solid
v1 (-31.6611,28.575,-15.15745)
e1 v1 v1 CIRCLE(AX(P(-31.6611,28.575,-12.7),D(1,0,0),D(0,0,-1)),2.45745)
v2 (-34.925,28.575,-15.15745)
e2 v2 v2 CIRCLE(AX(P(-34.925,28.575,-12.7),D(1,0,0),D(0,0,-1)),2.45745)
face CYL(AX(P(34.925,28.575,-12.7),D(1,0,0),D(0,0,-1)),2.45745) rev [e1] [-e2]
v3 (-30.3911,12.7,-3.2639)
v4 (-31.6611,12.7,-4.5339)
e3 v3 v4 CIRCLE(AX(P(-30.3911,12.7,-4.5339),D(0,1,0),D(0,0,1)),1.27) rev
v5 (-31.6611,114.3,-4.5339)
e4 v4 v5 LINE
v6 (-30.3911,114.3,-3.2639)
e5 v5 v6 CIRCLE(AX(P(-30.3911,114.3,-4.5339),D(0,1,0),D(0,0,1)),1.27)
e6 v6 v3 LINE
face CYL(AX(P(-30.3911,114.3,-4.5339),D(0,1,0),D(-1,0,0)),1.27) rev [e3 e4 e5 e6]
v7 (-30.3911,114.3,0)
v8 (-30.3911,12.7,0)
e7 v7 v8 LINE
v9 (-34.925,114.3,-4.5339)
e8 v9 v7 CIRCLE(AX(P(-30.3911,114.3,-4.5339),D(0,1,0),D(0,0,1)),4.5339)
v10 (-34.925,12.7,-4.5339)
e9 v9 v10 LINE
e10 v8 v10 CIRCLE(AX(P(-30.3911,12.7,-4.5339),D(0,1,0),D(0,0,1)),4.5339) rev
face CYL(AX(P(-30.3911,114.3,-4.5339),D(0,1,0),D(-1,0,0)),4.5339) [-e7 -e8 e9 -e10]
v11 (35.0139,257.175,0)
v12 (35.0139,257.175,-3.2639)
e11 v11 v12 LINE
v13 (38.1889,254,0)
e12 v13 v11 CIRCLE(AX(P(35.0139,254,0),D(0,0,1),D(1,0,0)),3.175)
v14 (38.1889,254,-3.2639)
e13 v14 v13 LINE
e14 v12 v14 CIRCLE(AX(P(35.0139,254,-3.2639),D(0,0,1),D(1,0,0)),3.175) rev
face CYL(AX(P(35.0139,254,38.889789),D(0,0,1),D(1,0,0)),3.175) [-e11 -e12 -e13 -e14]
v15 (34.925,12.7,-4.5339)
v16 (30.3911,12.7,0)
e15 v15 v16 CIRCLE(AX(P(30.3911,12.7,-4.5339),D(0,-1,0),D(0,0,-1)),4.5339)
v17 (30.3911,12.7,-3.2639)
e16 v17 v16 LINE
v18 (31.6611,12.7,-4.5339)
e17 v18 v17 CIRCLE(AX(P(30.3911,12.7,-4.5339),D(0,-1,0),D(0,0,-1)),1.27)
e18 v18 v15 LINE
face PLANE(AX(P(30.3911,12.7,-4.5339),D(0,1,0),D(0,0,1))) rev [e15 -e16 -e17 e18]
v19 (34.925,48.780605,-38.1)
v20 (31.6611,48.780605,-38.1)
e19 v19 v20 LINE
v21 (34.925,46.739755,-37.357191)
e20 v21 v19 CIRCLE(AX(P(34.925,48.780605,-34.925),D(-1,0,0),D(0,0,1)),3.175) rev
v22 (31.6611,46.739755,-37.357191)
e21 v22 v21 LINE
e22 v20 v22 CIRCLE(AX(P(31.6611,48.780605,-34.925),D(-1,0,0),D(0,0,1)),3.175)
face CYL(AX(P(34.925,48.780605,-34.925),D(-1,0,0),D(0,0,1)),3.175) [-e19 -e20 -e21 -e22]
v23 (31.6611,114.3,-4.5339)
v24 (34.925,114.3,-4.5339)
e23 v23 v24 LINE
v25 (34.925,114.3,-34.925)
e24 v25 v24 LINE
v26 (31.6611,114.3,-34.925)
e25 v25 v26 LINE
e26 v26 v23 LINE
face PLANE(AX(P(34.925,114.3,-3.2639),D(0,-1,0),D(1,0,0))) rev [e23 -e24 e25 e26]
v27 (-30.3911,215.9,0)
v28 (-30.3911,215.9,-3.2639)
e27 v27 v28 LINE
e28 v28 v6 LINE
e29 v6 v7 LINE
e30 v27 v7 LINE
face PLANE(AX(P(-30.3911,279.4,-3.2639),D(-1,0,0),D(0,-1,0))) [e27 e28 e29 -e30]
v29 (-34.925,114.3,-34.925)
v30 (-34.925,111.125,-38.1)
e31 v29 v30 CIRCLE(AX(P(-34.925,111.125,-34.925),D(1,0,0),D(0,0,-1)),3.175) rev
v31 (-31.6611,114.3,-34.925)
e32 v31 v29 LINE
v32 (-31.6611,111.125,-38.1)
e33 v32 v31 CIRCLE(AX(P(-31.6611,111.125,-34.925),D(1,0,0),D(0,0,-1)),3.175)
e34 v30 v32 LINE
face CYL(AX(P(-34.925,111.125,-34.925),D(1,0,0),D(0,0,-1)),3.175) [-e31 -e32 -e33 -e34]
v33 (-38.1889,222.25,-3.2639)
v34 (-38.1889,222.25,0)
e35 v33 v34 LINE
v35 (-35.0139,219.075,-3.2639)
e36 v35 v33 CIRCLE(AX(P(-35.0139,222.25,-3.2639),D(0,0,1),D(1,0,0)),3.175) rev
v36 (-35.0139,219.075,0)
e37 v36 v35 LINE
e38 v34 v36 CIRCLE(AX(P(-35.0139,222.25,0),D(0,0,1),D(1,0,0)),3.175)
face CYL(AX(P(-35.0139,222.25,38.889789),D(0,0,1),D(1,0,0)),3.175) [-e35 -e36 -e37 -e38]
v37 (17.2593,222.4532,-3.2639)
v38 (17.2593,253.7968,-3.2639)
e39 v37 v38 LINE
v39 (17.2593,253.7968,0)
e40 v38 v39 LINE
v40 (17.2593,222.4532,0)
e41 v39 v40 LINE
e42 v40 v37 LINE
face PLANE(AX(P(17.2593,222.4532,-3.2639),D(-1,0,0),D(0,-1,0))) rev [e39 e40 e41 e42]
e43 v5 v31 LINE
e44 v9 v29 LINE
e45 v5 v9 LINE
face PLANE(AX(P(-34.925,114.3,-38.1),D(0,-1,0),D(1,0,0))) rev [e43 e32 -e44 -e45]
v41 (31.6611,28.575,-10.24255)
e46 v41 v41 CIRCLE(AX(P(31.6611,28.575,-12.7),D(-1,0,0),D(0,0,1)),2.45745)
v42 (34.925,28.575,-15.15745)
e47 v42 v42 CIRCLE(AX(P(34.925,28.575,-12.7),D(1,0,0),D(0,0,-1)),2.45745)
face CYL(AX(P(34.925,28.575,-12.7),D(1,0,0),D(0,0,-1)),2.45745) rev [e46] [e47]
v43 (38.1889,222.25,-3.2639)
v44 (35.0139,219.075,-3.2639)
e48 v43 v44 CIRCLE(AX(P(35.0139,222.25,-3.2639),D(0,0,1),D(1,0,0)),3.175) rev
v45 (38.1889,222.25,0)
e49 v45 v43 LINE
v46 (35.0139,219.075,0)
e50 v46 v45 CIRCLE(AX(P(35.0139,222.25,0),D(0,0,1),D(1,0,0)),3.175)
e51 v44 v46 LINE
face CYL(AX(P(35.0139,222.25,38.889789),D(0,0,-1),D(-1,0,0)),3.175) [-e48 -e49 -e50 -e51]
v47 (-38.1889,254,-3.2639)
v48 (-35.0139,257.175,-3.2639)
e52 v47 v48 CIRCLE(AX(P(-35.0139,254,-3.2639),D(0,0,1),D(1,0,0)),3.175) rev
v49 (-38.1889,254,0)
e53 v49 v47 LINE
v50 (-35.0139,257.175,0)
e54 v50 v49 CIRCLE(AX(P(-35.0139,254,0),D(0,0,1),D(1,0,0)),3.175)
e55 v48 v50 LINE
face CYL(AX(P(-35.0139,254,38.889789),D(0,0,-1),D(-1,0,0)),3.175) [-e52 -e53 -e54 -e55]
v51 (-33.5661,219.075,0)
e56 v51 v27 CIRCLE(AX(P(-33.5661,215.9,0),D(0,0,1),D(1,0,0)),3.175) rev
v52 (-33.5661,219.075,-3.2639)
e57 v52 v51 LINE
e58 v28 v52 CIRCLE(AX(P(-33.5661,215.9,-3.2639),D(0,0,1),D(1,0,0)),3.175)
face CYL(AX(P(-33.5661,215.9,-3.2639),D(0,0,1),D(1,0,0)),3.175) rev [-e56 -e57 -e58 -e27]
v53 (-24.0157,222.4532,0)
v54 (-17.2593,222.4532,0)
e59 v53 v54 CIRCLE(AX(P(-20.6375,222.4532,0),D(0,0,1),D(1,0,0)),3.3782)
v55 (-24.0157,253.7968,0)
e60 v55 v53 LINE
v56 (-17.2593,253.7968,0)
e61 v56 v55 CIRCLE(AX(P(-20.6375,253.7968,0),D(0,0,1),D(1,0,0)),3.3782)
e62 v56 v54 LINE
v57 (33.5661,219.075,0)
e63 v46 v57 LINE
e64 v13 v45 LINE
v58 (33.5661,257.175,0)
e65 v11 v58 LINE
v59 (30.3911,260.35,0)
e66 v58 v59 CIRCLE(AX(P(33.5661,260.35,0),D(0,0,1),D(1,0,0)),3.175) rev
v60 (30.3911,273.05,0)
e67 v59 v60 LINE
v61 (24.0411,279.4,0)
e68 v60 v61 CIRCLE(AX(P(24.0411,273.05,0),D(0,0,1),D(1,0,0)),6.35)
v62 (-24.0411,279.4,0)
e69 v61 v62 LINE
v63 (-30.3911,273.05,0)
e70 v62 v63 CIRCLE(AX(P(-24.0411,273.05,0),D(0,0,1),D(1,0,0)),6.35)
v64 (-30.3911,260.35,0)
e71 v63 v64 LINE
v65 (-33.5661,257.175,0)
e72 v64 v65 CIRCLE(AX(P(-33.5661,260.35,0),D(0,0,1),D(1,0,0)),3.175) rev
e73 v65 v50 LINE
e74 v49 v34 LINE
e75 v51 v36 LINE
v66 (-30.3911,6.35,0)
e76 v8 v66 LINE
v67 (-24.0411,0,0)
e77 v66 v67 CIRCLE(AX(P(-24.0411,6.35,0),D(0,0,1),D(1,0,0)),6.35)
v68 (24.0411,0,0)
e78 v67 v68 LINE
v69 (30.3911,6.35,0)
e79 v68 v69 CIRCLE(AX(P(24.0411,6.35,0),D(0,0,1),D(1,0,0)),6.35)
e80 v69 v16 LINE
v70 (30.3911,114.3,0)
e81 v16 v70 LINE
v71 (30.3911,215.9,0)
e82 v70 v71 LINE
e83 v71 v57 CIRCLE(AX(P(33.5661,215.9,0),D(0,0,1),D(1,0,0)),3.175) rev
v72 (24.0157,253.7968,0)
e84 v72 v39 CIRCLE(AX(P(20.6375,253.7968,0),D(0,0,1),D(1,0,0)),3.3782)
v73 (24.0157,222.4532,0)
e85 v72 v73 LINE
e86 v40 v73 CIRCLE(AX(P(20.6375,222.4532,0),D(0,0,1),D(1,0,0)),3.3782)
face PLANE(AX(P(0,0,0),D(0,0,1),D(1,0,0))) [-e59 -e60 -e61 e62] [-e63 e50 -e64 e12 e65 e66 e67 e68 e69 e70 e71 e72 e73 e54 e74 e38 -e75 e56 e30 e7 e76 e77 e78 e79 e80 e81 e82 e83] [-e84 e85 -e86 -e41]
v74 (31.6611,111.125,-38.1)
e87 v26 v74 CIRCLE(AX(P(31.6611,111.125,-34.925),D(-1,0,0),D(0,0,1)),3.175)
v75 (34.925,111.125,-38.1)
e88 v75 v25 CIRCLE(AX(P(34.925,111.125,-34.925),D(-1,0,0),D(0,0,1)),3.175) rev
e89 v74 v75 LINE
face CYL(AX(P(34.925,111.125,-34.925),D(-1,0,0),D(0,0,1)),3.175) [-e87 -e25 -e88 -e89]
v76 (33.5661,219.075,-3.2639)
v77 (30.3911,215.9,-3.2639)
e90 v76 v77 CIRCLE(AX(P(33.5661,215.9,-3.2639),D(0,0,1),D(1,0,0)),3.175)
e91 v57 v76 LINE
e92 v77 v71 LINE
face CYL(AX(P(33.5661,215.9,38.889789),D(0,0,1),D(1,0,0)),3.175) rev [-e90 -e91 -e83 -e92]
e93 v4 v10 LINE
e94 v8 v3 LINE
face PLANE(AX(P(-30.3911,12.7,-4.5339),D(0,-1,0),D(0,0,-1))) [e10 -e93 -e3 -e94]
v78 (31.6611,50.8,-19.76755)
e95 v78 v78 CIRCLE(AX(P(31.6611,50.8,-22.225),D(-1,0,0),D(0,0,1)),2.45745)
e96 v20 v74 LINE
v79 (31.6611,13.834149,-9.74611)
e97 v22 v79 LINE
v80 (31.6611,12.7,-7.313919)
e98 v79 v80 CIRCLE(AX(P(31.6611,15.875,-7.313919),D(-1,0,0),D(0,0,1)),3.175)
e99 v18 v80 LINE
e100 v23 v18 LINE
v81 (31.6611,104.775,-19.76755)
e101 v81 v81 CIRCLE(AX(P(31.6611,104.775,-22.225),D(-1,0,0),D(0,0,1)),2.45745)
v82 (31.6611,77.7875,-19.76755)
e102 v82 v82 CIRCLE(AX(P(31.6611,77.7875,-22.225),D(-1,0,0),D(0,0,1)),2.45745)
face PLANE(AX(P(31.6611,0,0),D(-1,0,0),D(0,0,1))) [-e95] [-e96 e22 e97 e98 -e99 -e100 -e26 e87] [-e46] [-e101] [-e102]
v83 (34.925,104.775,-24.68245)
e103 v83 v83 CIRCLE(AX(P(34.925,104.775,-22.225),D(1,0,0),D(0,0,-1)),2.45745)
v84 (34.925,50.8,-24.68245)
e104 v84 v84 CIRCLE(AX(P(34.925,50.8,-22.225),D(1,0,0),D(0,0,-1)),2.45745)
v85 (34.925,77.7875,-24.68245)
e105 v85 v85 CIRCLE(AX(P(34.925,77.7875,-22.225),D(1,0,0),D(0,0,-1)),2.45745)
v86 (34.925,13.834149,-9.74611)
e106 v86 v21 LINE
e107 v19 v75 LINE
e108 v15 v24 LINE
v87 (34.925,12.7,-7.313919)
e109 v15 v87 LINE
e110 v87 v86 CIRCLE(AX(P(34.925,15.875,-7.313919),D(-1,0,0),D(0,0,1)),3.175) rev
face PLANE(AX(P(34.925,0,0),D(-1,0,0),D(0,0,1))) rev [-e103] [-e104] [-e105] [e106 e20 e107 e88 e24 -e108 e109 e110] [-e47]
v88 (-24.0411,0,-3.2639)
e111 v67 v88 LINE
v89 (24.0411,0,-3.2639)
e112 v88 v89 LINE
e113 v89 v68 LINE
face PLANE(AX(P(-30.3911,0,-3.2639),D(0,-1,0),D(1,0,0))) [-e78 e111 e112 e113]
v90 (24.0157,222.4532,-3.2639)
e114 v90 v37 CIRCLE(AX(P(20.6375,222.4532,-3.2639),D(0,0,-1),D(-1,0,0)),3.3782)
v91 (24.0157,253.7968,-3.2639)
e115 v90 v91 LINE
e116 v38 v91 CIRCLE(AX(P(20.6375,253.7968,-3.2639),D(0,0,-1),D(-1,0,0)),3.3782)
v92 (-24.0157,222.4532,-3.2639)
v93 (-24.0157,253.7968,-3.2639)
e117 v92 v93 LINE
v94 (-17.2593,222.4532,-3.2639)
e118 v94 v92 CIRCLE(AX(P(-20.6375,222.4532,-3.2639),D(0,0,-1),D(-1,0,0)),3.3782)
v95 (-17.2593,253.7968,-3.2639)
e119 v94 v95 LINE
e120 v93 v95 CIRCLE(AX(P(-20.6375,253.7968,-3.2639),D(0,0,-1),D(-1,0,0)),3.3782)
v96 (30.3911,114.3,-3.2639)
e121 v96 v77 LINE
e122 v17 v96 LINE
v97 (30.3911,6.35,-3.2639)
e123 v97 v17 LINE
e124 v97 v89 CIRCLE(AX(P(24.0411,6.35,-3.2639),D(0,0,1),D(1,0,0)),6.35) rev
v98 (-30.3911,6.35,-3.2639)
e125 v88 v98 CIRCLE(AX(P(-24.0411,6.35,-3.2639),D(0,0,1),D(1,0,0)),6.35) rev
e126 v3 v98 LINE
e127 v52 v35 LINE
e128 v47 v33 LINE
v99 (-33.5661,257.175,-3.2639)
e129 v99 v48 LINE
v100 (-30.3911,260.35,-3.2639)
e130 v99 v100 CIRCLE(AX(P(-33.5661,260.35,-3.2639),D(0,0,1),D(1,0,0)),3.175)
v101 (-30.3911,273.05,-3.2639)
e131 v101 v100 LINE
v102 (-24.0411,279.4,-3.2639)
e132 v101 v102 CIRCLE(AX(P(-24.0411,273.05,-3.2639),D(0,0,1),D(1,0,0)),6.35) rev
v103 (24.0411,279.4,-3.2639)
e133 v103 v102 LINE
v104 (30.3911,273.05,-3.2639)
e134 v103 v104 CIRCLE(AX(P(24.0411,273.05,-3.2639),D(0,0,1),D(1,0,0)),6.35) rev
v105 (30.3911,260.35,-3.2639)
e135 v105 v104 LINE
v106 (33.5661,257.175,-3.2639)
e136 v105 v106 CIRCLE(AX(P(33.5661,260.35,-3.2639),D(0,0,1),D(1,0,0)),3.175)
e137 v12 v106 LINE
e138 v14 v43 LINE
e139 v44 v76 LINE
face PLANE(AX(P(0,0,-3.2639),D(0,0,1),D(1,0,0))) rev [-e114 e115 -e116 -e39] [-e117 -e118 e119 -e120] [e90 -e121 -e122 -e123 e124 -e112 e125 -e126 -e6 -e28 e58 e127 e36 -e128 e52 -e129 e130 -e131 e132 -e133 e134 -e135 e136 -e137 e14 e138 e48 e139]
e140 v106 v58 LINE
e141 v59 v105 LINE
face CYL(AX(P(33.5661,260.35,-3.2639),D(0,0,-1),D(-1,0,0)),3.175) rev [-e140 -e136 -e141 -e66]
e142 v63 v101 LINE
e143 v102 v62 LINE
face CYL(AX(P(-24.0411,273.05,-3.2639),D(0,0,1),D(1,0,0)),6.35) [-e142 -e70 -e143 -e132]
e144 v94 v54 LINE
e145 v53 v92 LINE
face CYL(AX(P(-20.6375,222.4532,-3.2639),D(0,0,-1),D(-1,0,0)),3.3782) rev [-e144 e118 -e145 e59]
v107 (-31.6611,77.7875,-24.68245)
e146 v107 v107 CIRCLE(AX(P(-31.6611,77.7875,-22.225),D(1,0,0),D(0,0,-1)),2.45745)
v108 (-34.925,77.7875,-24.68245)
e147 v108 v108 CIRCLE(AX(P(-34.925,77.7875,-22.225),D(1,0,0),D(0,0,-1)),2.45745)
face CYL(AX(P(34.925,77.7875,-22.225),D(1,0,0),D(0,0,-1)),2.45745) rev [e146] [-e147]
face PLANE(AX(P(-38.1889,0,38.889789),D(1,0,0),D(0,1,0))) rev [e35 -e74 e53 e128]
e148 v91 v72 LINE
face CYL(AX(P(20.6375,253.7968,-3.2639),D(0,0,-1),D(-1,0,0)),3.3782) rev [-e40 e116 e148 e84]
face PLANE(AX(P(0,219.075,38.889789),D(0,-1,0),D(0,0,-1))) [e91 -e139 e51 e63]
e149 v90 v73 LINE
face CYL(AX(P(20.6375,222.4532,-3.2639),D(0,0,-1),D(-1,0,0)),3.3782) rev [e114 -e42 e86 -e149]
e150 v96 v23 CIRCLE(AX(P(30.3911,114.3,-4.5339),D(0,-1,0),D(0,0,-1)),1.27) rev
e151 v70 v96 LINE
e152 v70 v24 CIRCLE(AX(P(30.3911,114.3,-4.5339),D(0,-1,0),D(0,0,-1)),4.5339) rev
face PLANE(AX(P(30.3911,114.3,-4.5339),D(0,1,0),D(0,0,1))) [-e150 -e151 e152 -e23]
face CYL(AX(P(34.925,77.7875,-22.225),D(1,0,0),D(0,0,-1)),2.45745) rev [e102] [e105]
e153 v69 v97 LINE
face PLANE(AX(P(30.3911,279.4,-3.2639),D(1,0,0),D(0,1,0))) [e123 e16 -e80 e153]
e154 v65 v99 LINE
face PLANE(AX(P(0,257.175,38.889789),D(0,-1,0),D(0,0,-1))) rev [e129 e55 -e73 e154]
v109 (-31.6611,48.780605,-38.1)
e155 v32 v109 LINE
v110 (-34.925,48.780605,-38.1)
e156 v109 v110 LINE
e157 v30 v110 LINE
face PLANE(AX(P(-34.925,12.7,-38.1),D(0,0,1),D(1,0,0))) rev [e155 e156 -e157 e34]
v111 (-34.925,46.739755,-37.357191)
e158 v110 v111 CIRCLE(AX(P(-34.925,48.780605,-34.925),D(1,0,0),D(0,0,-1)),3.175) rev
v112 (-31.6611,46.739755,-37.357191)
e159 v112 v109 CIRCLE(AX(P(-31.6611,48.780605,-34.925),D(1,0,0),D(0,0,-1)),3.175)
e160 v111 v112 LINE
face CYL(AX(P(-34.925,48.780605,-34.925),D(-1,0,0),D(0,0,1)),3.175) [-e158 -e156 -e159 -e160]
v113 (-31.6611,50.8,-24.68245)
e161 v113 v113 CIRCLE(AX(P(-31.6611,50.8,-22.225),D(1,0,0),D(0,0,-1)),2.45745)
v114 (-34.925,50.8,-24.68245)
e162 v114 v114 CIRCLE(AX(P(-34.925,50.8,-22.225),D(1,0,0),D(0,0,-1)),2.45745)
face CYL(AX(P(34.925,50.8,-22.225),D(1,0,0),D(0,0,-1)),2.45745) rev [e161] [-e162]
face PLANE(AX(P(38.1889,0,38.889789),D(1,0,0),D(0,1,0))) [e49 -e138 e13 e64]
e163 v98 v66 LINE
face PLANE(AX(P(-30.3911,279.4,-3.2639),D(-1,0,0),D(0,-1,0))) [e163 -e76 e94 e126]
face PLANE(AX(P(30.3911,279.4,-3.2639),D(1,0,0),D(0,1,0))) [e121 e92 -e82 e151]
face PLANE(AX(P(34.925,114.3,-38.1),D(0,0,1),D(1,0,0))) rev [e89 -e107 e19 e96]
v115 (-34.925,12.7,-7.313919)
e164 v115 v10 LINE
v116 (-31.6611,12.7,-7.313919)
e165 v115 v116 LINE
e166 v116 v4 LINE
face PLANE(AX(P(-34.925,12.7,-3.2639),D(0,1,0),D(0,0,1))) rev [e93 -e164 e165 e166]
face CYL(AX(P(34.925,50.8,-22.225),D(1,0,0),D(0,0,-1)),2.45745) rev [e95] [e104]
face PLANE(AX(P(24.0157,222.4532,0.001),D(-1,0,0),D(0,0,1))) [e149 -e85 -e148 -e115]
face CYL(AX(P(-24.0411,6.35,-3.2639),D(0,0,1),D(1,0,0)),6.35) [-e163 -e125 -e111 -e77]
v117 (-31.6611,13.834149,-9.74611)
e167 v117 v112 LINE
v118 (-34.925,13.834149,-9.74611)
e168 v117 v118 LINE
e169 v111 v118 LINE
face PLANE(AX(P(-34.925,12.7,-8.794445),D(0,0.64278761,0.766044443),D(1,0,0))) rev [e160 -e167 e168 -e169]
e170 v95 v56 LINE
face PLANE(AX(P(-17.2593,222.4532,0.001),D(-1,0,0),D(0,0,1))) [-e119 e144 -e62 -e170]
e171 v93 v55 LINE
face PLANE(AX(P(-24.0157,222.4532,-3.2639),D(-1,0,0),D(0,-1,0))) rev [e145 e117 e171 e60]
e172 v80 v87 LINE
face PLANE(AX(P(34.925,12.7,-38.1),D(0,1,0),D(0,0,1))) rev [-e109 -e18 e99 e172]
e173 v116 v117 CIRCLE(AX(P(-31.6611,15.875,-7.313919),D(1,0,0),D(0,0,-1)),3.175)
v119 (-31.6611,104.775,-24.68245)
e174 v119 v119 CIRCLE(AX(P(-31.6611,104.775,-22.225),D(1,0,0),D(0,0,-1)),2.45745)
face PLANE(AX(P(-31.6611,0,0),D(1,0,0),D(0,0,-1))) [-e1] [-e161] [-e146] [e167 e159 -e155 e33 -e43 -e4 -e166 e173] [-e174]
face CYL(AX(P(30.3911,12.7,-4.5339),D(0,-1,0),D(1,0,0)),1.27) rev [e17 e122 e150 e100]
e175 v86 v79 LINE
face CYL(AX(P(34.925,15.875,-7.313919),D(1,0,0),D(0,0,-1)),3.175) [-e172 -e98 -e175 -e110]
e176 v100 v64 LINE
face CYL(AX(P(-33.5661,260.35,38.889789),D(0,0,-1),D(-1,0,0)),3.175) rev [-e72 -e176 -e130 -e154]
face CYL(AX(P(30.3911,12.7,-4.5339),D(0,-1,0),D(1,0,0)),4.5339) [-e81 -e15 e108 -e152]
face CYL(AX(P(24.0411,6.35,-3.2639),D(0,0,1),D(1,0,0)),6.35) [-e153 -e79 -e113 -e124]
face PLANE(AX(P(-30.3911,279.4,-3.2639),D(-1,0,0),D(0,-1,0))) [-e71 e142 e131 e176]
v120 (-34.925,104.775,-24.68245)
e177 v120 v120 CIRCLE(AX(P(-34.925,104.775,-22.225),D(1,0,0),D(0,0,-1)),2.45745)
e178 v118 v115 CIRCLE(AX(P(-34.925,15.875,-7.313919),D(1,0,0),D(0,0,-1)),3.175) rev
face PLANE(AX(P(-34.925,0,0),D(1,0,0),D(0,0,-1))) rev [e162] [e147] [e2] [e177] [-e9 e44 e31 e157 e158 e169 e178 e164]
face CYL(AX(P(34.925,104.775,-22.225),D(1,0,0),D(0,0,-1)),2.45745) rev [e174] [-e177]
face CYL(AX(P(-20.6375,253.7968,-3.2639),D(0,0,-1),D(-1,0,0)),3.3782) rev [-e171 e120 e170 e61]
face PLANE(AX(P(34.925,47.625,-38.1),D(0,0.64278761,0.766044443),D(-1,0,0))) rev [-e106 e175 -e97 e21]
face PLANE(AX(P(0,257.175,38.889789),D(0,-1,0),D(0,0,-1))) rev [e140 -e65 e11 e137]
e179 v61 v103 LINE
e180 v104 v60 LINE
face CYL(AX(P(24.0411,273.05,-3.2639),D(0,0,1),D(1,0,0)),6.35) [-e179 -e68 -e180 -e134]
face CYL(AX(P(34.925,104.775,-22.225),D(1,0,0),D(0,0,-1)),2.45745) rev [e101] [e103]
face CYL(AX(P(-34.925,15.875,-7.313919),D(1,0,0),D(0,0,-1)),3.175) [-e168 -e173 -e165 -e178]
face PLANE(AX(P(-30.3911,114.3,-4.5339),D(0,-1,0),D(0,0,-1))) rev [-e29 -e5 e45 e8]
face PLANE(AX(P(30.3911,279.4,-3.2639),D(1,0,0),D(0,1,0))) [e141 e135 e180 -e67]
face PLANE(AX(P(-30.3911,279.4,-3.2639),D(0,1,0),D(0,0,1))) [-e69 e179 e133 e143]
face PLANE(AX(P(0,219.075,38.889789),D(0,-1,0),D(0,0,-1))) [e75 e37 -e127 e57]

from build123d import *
from OCP.BRepFilletAPI import BRepFilletAPI_MakeChamfer

# Parameters (mm, degrees)
SKETCH2_W                    = 60.7822
SKETCH2_H                    = 279.4
BASE_FLANGE1_DEPTH           = 3.2639
EDGE_FLANGE1_DEPTH           = 101.6
EDGE_FLANGE1_BEND_DEPTH      = 101.6
CHAMFER1_SIZE                = 34.925
CHAMFER1_SIZE2               = 29.305554619
F_10_0_1935_DIAMETER_HOLE1_D = 4.9149
F_1_4_START                  = -3.2639
F_1_4_CLEARANCE_SLOT1_DEPTH  = 3.2639
SKETCH17_W                   = 7.7978
SKETCH17_H                   = 38.1
BOSS_EXTRUDE1_DEPTH          = 3.2639
FILLET1_R                    = 3.175
FILLET2_R                    = 6.35


# Read off the part's stored shape, not the designer's step: 1/4 Clearance Slot1
# Sheet-metal steps are written as plain solids
with BuildPart() as part:
    # Sketch2 → Base-Flange1 (new body)
    with BuildSketch(Plane.XY):
        with Locations((0, 139.7)):
            Rectangle(SKETCH2_W, SKETCH2_H)
    extrude(amount=-BASE_FLANGE1_DEPTH)

    # Edge-Flange1 section (across the edge) → Edge-Flange1 (add)
    with BuildSketch(Plane(origin=(31.6611, 114.3, -3.2639), x_dir=(-1, 0, 0), z_dir=(0, -1, 0))):
        with BuildLine():
            Line((-3.2639, 1.27), (-3.2639, 34.8361))
            Line((-3.2639, 34.8361), (0, 34.8361))
            Line((0, 34.8361), (0, 1.27))
            ThreePointArc((0, 1.27), (0.371974388, 0.371974388), (1.27, 0))
            Line((1.27, 0), (1.27, -3.2639))
            ThreePointArc((1.27, -3.2639), (-1.935951435, -1.935951435), (-3.2639, 1.27))
        make_face()
    extrude(amount=EDGE_FLANGE1_DEPTH)

    # Edge-Flange1 section 2 (across the edge) → Edge-Flange1 bend (add)
    with BuildSketch(Plane(origin=(-31.6611, 12.7, -3.2639), x_dir=(1, 0, 0), z_dir=(0, 1, 0))):
        with BuildLine():
            Line((-3.2639, 1.27), (-3.2639, 34.8361))
            Line((-3.2639, 34.8361), (0, 34.8361))
            Line((0, 34.8361), (0, 1.27))
            ThreePointArc((0, 1.27), (0.371974388, 0.371974388), (1.27, 0))
            Line((1.27, 0), (1.27, -3.2639))
            ThreePointArc((1.27, -3.2639), (-1.935951435, -1.935951435), (-3.2639, 1.27))
        make_face()
    extrude(amount=EDGE_FLANGE1_BEND_DEPTH)

    # Chamfer1: one chamfer whose edges measure the first distance from different faces: ONE call of the kernel's chamfer builder (chamfer() names one face for all edges)
    chamfer1_edges_1 = [part.edges().sort_by_distance(p)[0] for p in [
        (33.29305, 12.7, -38.1),
    ]]
    chamfer1_side_1 = [part.faces().sort_by_distance(p)[0] for p in [
        (33.29305, 63.5, -38.1),
    ]]
    chamfer1_edges_2 = [part.edges().sort_by_distance(p)[0] for p in [
        (-33.29305, 12.7, -38.1),
    ]]
    chamfer1_side_2 = [part.faces().sort_by_distance(p)[0] for p in [
        (-33.29305, 63.5, -38.1),
    ]]
    chamfer1 = BRepFilletAPI_MakeChamfer(part.part.solid().wrapped)
    for e in chamfer1_edges_1:
        chamfer1.Add(CHAMFER1_SIZE, CHAMFER1_SIZE2, e.wrapped, chamfer1_side_1[0].wrapped)  # the first distance lies on this face
    for e in chamfer1_edges_2:
        chamfer1.Add(CHAMFER1_SIZE, CHAMFER1_SIZE2, e.wrapped, chamfer1_side_2[0].wrapped)  # the first distance lies on this face
    add(Compound.cast(chamfer1.Shape()), mode=Mode.REPLACE)

    # #10 (0.1935) Diameter Hole1 (through all)
    with Locations(Plane(origin=(34.925, 0, 0), x_dir=(0, 0, -1), z_dir=(1, 0, 0))):
        with Locations((22.225, 104.775), (22.225, 77.7875), (22.225, 50.8), (12.7, 28.575)):
            Hole(F_10_0_1935_DIAMETER_HOLE1_D / 2)

    # 1/4 Clearance Slot1 outline → 1/4 Clearance Slot1 (cut)
    with BuildSketch(Plane.XY.offset(F_1_4_START)):
        with BuildLine():
            ThreePointArc((-17.2593, 253.7968), (-20.6375, 257.175), (-24.0157, 253.7968))
            Line((-24.0157, 253.7968), (-24.0157, 222.4532))
            ThreePointArc((-24.0157, 222.4532), (-20.6375, 219.075), (-17.2593, 222.4532))
            Line((-17.2593, 222.4532), (-17.2593, 253.7968))
        make_face()
        with BuildLine():
            ThreePointArc((24.0157, 253.7968), (20.6375, 257.175), (17.2593, 253.7968))
            Line((17.2593, 253.7968), (17.2593, 222.4532))
            ThreePointArc((17.2593, 222.4532), (20.6375, 219.075), (24.0157, 222.4532))
            Line((24.0157, 222.4532), (24.0157, 253.7968))
        make_face()
    extrude(amount=F_1_4_CLEARANCE_SLOT1_DEPTH, mode=Mode.SUBTRACT)

    # Sketch17 → Boss-Extrude1 (add)
    with BuildSketch(Plane(origin=(0, 0, -3.2639), x_dir=(-1, 0, 0), z_dir=(0, 0, -1))):
        with Locations((-34.29, 238.125)):
            Rectangle(SKETCH17_W, SKETCH17_H)
        with Locations((34.29, 238.125)):
            Rectangle(SKETCH17_W, SKETCH17_H)
    extrude(amount=-BOSS_EXTRUDE1_DEPTH)

    # Fillet1
    fillet1_edges = [part.edges().sort_by_distance(p)[0] for p in [
        (30.3911, 219.075, -1.63195),
        (30.3911, 257.175, -1.63195),
        (38.1889, 257.175, -1.63195),
        (38.1889, 219.075, -1.63195),
        (-38.1889, 257.175, -1.63195),
        (-38.1889, 219.075, -1.63195),
        (-30.3911, 219.075, -1.63195),
        (-30.3911, 257.175, -1.63195),
        (33.29305, 114.3, -38.1),
        (-33.29305, 114.3, -38.1),
        (33.29305, 47.625, -38.1),
        (33.29305, 12.7, -8.794445381),
        (-33.29305, 12.7, -8.794445381),
        (-33.29305, 47.625, -38.1),
    ]]
    fillet(fillet1_edges, radius=FILLET1_R)

    # Fillet2
    fillet2_edges = [part.edges().sort_by_distance(p)[0] for p in [
        (-30.3911, 279.4, -1.63195),
        (30.3911, 279.4, -1.63195),
        (30.3911, 0, -1.63195),
        (-30.3911, 0, -1.63195),
    ]]
    fillet(fillet2_edges, radius=FILLET2_R)


solid = part.part
